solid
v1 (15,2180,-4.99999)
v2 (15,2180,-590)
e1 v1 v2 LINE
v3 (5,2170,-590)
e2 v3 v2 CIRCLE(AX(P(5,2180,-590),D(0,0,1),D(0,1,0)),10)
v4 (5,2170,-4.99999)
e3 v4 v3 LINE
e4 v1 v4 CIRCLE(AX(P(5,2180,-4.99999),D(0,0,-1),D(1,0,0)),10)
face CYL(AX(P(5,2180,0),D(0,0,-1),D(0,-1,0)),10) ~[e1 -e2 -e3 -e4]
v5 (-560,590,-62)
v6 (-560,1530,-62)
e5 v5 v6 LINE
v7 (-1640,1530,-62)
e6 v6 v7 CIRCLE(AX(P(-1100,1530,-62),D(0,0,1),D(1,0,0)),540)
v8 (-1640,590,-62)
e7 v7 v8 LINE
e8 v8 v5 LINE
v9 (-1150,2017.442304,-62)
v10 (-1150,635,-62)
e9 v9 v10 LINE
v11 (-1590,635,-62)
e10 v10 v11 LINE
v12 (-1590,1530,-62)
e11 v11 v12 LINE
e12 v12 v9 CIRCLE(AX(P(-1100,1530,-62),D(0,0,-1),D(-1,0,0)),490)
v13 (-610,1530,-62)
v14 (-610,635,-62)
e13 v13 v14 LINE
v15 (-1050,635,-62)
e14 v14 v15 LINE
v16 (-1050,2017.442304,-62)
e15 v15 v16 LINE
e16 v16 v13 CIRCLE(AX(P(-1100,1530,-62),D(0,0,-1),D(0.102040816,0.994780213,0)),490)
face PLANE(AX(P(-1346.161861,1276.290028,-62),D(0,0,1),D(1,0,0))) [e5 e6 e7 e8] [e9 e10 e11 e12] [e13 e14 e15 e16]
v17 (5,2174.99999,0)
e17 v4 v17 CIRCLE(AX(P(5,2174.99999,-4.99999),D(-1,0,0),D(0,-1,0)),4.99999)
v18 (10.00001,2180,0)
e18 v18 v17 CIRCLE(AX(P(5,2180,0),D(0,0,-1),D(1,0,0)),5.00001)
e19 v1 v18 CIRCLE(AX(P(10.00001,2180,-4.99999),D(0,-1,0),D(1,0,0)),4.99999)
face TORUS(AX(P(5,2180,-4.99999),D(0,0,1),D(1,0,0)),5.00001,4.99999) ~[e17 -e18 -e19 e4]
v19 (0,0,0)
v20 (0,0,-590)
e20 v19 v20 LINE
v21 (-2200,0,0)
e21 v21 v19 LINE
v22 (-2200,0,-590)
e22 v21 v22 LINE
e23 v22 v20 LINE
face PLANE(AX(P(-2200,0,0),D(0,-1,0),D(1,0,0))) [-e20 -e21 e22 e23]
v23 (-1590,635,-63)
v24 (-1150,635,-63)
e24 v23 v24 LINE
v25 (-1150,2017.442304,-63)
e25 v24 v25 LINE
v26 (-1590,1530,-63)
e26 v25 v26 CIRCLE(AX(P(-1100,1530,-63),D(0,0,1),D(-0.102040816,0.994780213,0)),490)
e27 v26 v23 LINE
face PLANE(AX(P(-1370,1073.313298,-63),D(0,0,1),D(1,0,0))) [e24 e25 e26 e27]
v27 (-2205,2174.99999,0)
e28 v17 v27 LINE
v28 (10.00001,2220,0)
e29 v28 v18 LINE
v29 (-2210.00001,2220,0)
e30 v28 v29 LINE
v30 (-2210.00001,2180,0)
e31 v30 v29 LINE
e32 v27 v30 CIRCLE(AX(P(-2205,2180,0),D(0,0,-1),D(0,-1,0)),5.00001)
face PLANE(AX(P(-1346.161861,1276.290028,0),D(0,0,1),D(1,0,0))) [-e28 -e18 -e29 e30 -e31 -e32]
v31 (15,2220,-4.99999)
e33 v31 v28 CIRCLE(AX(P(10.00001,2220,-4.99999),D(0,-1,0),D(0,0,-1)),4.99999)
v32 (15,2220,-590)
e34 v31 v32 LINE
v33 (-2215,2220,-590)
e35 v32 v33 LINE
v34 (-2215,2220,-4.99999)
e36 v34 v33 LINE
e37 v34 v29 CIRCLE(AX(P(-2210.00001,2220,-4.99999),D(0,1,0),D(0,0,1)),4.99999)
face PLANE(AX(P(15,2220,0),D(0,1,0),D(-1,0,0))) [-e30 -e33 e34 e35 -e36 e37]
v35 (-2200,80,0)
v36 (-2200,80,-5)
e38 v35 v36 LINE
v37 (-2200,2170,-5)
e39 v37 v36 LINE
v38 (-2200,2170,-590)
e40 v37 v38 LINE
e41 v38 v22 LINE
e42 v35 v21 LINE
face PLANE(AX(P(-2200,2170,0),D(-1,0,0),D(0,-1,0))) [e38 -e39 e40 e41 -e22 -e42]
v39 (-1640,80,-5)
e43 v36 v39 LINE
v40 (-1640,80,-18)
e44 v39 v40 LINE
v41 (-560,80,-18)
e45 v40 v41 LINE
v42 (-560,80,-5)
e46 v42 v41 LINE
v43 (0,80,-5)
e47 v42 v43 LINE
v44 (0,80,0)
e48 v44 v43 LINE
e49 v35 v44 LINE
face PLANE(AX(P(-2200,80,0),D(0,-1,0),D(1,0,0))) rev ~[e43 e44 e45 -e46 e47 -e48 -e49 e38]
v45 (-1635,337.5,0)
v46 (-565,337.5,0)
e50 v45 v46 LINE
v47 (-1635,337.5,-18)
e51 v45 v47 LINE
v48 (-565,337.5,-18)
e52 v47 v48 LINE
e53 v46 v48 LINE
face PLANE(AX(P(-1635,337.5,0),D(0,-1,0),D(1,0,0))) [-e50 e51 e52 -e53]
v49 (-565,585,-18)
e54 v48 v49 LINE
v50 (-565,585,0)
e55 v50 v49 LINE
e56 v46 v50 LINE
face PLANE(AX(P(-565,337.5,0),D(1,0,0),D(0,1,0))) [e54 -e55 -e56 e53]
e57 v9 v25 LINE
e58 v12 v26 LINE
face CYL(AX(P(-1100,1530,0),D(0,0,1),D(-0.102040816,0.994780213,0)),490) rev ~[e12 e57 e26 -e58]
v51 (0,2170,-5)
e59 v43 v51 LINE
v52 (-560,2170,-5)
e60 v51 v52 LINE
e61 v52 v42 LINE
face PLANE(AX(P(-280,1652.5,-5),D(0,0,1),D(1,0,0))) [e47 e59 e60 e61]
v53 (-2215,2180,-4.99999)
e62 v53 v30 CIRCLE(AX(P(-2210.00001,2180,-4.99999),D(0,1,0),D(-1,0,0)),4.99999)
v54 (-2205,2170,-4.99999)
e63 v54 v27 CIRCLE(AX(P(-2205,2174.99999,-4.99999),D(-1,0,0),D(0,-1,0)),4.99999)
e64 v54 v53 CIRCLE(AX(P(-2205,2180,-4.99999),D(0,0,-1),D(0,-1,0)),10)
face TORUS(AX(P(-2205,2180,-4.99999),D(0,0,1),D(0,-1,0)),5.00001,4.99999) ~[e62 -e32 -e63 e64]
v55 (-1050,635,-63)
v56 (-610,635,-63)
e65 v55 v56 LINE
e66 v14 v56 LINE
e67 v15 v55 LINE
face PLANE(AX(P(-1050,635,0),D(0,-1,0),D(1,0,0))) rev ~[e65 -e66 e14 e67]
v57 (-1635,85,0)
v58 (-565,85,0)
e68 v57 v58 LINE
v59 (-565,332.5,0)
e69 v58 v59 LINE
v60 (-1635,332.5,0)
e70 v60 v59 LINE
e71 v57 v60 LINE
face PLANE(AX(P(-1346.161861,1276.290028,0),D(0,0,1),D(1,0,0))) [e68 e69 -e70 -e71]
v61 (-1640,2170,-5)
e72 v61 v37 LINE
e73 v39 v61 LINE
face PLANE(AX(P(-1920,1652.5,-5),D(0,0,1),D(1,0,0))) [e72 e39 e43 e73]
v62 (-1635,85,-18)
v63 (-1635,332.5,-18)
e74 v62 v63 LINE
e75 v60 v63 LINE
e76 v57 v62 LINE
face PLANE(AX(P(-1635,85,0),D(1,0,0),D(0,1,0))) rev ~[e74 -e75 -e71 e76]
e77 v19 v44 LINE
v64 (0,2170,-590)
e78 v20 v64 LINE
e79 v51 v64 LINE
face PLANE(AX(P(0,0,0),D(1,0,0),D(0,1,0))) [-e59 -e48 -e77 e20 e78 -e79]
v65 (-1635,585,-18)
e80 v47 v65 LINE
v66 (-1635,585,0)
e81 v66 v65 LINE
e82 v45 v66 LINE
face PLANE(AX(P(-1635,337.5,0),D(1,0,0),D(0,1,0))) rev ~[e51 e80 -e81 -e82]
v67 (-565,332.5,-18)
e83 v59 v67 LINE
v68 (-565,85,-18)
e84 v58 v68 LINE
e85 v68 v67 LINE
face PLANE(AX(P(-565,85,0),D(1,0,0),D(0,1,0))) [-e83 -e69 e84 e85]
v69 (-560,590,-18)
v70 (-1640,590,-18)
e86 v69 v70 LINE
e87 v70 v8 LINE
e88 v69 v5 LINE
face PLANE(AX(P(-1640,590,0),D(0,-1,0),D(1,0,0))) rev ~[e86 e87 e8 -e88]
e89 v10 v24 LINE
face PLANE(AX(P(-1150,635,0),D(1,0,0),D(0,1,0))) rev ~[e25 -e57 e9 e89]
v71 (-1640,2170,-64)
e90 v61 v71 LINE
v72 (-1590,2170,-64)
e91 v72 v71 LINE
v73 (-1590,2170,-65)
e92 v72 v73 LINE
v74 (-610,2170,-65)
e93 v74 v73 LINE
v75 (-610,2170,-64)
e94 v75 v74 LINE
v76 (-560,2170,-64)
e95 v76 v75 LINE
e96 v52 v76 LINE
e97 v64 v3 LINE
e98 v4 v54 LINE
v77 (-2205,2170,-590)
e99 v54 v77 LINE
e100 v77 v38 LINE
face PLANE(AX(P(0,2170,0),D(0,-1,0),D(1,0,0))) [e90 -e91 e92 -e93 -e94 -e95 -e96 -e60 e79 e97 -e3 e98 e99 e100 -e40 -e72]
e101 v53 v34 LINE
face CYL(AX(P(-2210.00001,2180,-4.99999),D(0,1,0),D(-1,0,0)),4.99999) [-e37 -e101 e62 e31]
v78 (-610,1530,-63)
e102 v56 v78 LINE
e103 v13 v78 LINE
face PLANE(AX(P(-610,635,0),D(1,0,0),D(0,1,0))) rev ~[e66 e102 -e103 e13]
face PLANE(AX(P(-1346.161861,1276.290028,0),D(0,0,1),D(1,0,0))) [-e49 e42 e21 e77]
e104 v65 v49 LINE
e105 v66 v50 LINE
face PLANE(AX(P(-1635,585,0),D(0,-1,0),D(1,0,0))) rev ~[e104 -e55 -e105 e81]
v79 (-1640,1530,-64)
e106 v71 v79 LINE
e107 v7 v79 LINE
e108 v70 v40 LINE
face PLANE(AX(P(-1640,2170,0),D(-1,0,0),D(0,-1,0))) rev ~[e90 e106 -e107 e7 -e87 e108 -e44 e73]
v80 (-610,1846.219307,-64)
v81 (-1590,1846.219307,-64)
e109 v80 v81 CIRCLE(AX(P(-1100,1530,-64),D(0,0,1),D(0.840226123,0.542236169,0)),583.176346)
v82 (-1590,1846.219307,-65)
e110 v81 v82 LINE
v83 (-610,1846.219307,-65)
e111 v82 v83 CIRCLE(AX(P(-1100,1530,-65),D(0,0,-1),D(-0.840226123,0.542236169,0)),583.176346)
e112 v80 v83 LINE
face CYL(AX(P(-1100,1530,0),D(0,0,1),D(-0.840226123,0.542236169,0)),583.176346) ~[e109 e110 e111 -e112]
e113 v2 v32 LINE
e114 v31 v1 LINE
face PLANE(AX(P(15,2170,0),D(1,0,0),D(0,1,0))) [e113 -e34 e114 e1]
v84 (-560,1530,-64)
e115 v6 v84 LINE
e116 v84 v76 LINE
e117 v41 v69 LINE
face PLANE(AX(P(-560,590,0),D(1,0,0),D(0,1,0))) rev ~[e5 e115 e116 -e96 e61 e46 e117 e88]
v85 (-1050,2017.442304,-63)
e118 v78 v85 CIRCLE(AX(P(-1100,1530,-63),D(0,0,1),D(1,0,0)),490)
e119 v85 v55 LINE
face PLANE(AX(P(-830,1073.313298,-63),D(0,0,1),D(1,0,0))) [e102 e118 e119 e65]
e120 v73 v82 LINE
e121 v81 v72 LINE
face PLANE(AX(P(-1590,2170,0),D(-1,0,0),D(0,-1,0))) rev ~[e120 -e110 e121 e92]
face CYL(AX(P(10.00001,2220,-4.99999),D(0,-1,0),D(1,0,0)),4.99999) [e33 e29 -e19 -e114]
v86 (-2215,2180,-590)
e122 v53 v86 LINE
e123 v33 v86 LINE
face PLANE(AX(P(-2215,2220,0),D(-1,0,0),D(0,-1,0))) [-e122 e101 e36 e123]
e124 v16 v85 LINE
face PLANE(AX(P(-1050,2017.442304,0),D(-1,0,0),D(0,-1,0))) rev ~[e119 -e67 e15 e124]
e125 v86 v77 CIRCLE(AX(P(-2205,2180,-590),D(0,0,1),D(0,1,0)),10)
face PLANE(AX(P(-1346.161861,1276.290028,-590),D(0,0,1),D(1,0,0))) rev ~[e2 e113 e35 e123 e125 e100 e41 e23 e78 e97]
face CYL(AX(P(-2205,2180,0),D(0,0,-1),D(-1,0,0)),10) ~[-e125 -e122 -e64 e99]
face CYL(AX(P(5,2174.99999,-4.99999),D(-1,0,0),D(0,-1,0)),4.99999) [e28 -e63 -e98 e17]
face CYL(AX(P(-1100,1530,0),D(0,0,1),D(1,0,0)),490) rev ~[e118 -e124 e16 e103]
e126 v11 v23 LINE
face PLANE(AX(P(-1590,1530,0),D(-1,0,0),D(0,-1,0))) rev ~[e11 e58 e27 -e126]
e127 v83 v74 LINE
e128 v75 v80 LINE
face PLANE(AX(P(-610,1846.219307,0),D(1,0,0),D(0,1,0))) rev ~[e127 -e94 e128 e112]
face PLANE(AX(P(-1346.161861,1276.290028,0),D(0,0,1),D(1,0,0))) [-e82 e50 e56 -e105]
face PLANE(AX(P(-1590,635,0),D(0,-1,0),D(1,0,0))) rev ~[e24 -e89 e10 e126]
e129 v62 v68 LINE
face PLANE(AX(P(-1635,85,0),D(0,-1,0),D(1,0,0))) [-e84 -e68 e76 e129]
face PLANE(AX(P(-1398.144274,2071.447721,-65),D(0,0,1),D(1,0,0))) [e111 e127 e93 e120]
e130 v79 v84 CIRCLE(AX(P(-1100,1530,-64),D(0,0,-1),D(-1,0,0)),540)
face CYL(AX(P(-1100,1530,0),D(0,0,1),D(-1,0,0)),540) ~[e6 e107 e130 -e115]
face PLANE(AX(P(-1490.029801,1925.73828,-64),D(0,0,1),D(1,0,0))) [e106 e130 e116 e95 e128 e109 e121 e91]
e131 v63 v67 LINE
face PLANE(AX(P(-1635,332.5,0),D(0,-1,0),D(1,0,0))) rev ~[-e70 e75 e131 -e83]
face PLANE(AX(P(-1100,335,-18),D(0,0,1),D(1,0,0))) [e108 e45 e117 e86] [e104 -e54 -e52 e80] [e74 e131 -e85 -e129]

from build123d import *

# Parameters (mm, degrees)
F0_W     = 1070
F0_H     = 247.5
F0_W_2   = 440
F0_H_2   = 876.6265964508
F1_DEPTH = 590
F2_R     = 10
F3_DEPTH = 65
F4_DEPTH = 64
F5_DEPTH = 62
F6_DEPTH = 63
F7_DEPTH = 5
F8_R     = 4.99999
F9_DEPTH = 18


# Not quite as in the source:
# - a fillet or chamfer is up to 0.001 mm smaller than in the source, because OpenCascade refuses the exact size
# - a feature of the source that left no trace in its solid (it failed there, or was rolled back) is left out


with BuildPart() as f1:
    # F0 (on Top) → F1 (new body)
    with BuildSketch(Plane.XY):
        with BuildLine():
            Line((-1640, 1530), (-1640, 1135))
            Line((-1640, 1135), (-1640, 590))
            Line((-1640, 590), (-1100, 590))
            Line((-1100, 590), (-1100, 1511.6265964508))
            Line((-1100, 1511.6265964508), (-1100, 2020))
            Line((-1100, 2020), (-1100, 2070))
            ThreePointArc((-1100, 2070), (-1481.8376618407, 1911.8376618407), (-1640, 1530))
        make_face()
        with BuildLine():
            Line((-1150, 1530), (-1150, 1511.6265964508))
            Line((-1150, 1511.6265964508), (-1150, 635))
            Line((-1150, 635), (-1590, 635))
            Line((-1590, 635), (-1590, 1511.6265964508))
            Line((-1590, 1511.6265964508), (-1590, 1530))
            ThreePointArc((-1590, 1530), (-1463.7306695895, 1858.3291031876), (-1150, 2017.4423042782))
            Line((-1150, 2017.4423042782), (-1150, 1530))
        make_face(mode=Mode.SUBTRACT)
        with BuildLine():
            Line((-560, 590), (-560, 1135))
            Line((-560, 1135), (-560, 1530))
            ThreePointArc((-560, 1530), (-644.9475295345, 1820.7357032139), (-873.0638856418, 2020))
            Line((-873.0638856418, 2020), (-1100, 2020))
            Line((-1100, 2020), (-1100, 1511.6265964508))
            Line((-1100, 1511.6265964508), (-1100, 590))
            Line((-1100, 590), (-560, 590))
        make_face()
        with BuildLine():
            Line((-1050, 635), (-1050, 1511.6265964508))
            Line((-1050, 1511.6265964508), (-1050, 1530))
            Line((-1050, 1530), (-1050, 2017.4423042782))
            ThreePointArc((-1050, 2017.4423042782), (-736.2693304105, 1858.3291031876), (-610, 1530))
            Line((-610, 1530), (-610, 1511.6265964508))
            Line((-610, 1511.6265964508), (-610, 635))
            Line((-610, 635), (-1050, 635))
        make_face(mode=Mode.SUBTRACT)
        Polygon((-560, 80), (0, 80), (0, 1135), (-560, 1135), (-560, 590), align=None)
        Polygon((-2200, 1135), (-2200, 80), (-1640, 80), (-1640, 590), (-1640, 1135), align=None)
        Polygon((-2200, 2170), (-2200, 1135), (-1640, 1135), (-1640, 1530), (-1640, 2170), align=None)
        Polygon((-560, 1135), (0, 1135), (0, 2170), (-560, 2170), (-560, 1530), align=None)
        Polygon((-1100, 80), (-560, 80), (-560, 590), (-1100, 590), (-1640, 590), (-1640, 80), align=None)
        with Locations((-1100, 208.75)):
            Rectangle(F0_W, F0_H, mode=Mode.SUBTRACT)
        with Locations((-1100, 461.25)):
            Rectangle(F0_W, F0_H, mode=Mode.SUBTRACT)
        with Locations((-830, 1073.3132982254)):
            Rectangle(F0_W_2, F0_H_2)
        with Locations((-1370, 1073.3132982254)):
            Rectangle(F0_W_2, F0_H_2)
        with Locations((-1100, 461.25)):
            Rectangle(F0_W, F0_H)
        with Locations((-1100, 208.75)):
            Rectangle(F0_W, F0_H)
        Polygon((-2200, 0), (0, 0), (0, 80), (-560, 80), (-1100, 80), (-1640, 80), (-2200, 80), align=None)
        with BuildLine():
            Line((-1590, 1511.6265964508), (-1150, 1511.6265964508))
            Line((-1150, 1511.6265964508), (-1150, 1530))
            Line((-1150, 1530), (-1150, 2017.4423042782))
            ThreePointArc((-1150, 2017.4423042782), (-1463.7306695895, 1858.3291031876), (-1590, 1530))
            Line((-1590, 1530), (-1590, 1511.6265964508))
        make_face()
        with BuildLine():
            Line((-1050, 1530), (-1050, 1511.6265964508))
            Line((-1050, 1511.6265964508), (-610, 1511.6265964508))
            Line((-610, 1511.6265964508), (-610, 1530))
            ThreePointArc((-610, 1530), (-736.2693304105, 1858.3291031876), (-1050, 2017.4423042782))
            Line((-1050, 2017.4423042782), (-1050, 1530))
        make_face()
        Polygon((-560, 2170), (0, 2170), (15, 2170), (15, 2220), (0, 2220), (-2200, 2220), (-2215, 2220), (-2215, 2170), (-2200, 2170), (-1640, 2170), (-1590, 2170), (-1100, 2170), (-610, 2170), align=None)
        with BuildLine():
            Line((-1100, 2170), (-1590, 2170))
            Line((-1590, 2170), (-1590, 1846.2193073328))
            ThreePointArc((-1590, 1846.2193073328), (-1379.000923117, 2042.1065662827), (-1100, 2113.1763458252))
            Line((-1100, 2113.1763458252), (-1100, 2170))
        make_face()
        with BuildLine():
            Line((-610, 2020), (-610, 2170))
            Line((-610, 2170), (-1100, 2170))
            Line((-1100, 2170), (-1100, 2113.1763458252))
            ThreePointArc((-1100, 2113.1763458252), (-935.1694189847, 2089.397470402), (-783.7806926672, 2020))
            Line((-783.7806926672, 2020), (-610, 2020))
        make_face()
        with BuildLine():
            Line((-1590, 2170), (-1640, 2170))
            Line((-1640, 2170), (-1640, 1530))
            ThreePointArc((-1640, 1530), (-1481.8376618407, 1911.8376618407), (-1100, 2070))
            Line((-1100, 2070), (-1100, 2113.1763458252))
            ThreePointArc((-1100, 2113.1763458252), (-1379.000923117, 2042.1065662827), (-1590, 1846.2193073328))
            Line((-1590, 1846.2193073328), (-1590, 2170))
        make_face()
        with BuildLine():
            Line((-560, 1530), (-560, 2170))
            Line((-560, 2170), (-610, 2170))
            Line((-610, 2170), (-610, 2020))
            Line((-610, 2020), (-610, 1846.2193073328))
            ThreePointArc((-610, 1846.2193073328), (-687.6320512394, 1942.3679487606), (-783.7806926672, 2020))
            Line((-783.7806926672, 2020), (-873.0638856418, 2020))
            ThreePointArc((-873.0638856418, 2020), (-644.9475295345, 1820.7357032139), (-560, 1530))
        make_face()
        with BuildLine():
            Line((-610, 1846.2193073328), (-610, 2020))
            Line((-610, 2020), (-783.7806926672, 2020))
            ThreePointArc((-783.7806926672, 2020), (-687.6320512394, 1942.3679487606), (-610, 1846.2193073328))
        make_face()
        with BuildLine():
            ThreePointArc((-1100, 2070), (-983.8104996138, 2057.3518749374), (-873.0638856418, 2020))
            Line((-873.0638856418, 2020), (-783.7806926672, 2020))
            ThreePointArc((-783.7806926672, 2020), (-935.1694189847, 2089.397470402), (-1100, 2113.1763458252))
            Line((-1100, 2113.1763458252), (-1100, 2070))
        make_face()
        with BuildLine():
            Line((-1100, 2020), (-873.0638856418, 2020))
            ThreePointArc((-873.0638856418, 2020), (-983.8104996138, 2057.3518749374), (-1100, 2070))
            Line((-1100, 2070), (-1100, 2020))
        make_face()
    extrude(amount=-F1_DEPTH)

    # F2
    f2_edges = [f1.edges().sort_by_distance(p)[0] for p in [
        (15, 2170, -295),
        (-2215, 2170, -295),
    ]]
    fillet(f2_edges, radius=F2_R)

    # F0 (on Top) → F3 (cut)
    with BuildSketch(Plane.XY):
        with BuildLine():
            Line((-1100, 2170), (-1590, 2170))
            Line((-1590, 2170), (-1590, 1846.2193073328))
            ThreePointArc((-1590, 1846.2193073328), (-1379.000923117, 2042.1065662827), (-1100, 2113.1763458252))
            Line((-1100, 2113.1763458252), (-1100, 2170))
        make_face()
        with BuildLine():
            Line((-610, 2020), (-610, 2170))
            Line((-610, 2170), (-1100, 2170))
            Line((-1100, 2170), (-1100, 2113.1763458252))
            ThreePointArc((-1100, 2113.1763458252), (-935.1694189847, 2089.397470402), (-783.7806926672, 2020))
            Line((-783.7806926672, 2020), (-610, 2020))
        make_face()
        with BuildLine():
            Line((-610, 1846.2193073328), (-610, 2020))
            Line((-610, 2020), (-783.7806926672, 2020))
            ThreePointArc((-783.7806926672, 2020), (-687.6320512394, 1942.3679487606), (-610, 1846.2193073328))
        make_face()
    extrude(amount=-F3_DEPTH, mode=Mode.SUBTRACT)

    # F0 (on Top) → F4 (cut)
    with BuildSketch(Plane.XY):
        with BuildLine():
            Line((-1590, 2170), (-1640, 2170))
            Line((-1640, 2170), (-1640, 1530))
            ThreePointArc((-1640, 1530), (-1481.8376618407, 1911.8376618407), (-1100, 2070))
            Line((-1100, 2070), (-1100, 2113.1763458252))
            ThreePointArc((-1100, 2113.1763458252), (-1379.000923117, 2042.1065662827), (-1590, 1846.2193073328))
            Line((-1590, 1846.2193073328), (-1590, 2170))
        make_face()
        with BuildLine():
            ThreePointArc((-1100, 2070), (-983.8104996138, 2057.3518749374), (-873.0638856418, 2020))
            Line((-873.0638856418, 2020), (-783.7806926672, 2020))
            ThreePointArc((-783.7806926672, 2020), (-935.1694189847, 2089.397470402), (-1100, 2113.1763458252))
            Line((-1100, 2113.1763458252), (-1100, 2070))
        make_face()
        with BuildLine():
            Line((-560, 1530), (-560, 2170))
            Line((-560, 2170), (-610, 2170))
            Line((-610, 2170), (-610, 2020))
            Line((-610, 2020), (-610, 1846.2193073328))
            ThreePointArc((-610, 1846.2193073328), (-687.6320512394, 1942.3679487606), (-783.7806926672, 2020))
            Line((-783.7806926672, 2020), (-873.0638856418, 2020))
            ThreePointArc((-873.0638856418, 2020), (-644.9475295345, 1820.7357032139), (-560, 1530))
        make_face()
    extrude(amount=-F4_DEPTH, mode=Mode.SUBTRACT)

    # F0 (on Top) → F5 (cut)
    with BuildSketch(Plane.XY):
        with BuildLine():
            Line((-1640, 1530), (-1640, 1135))
            Line((-1640, 1135), (-1640, 590))
            Line((-1640, 590), (-1100, 590))
            Line((-1100, 590), (-1100, 1511.6265964508))
            Line((-1100, 1511.6265964508), (-1100, 2020))
            Line((-1100, 2020), (-1100, 2070))
            ThreePointArc((-1100, 2070), (-1481.8376618407, 1911.8376618407), (-1640, 1530))
        make_face()
        with BuildLine():
            Line((-1150, 1530), (-1150, 1511.6265964508))
            Line((-1150, 1511.6265964508), (-1150, 635))
            Line((-1150, 635), (-1590, 635))
            Line((-1590, 635), (-1590, 1511.6265964508))
            Line((-1590, 1511.6265964508), (-1590, 1530))
            ThreePointArc((-1590, 1530), (-1463.7306695895, 1858.3291031876), (-1150, 2017.4423042782))
            Line((-1150, 2017.4423042782), (-1150, 1530))
        make_face(mode=Mode.SUBTRACT)
        with BuildLine():
            Line((-1100, 2020), (-873.0638856418, 2020))
            ThreePointArc((-873.0638856418, 2020), (-983.8104996138, 2057.3518749374), (-1100, 2070))
            Line((-1100, 2070), (-1100, 2020))
        make_face()
        with BuildLine():
            Line((-560, 590), (-560, 1135))
            Line((-560, 1135), (-560, 1530))
            ThreePointArc((-560, 1530), (-644.9475295345, 1820.7357032139), (-873.0638856418, 2020))
            Line((-873.0638856418, 2020), (-1100, 2020))
            Line((-1100, 2020), (-1100, 1511.6265964508))
            Line((-1100, 1511.6265964508), (-1100, 590))
            Line((-1100, 590), (-560, 590))
        make_face()
        with BuildLine():
            Line((-1050, 635), (-1050, 1511.6265964508))
            Line((-1050, 1511.6265964508), (-1050, 1530))
            Line((-1050, 1530), (-1050, 2017.4423042782))
            ThreePointArc((-1050, 2017.4423042782), (-736.2693304105, 1858.3291031876), (-610, 1530))
            Line((-610, 1530), (-610, 1511.6265964508))
            Line((-610, 1511.6265964508), (-610, 635))
            Line((-610, 635), (-1050, 635))
        make_face(mode=Mode.SUBTRACT)
    extrude(amount=-F5_DEPTH, mode=Mode.SUBTRACT)

    # F0 (on Top) → F6 (cut)
    with BuildSketch(Plane.XY):
        with Locations((-1370, 1073.3132982254)):
            Rectangle(F0_W_2, F0_H_2)
        with Locations((-830, 1073.3132982254)):
            Rectangle(F0_W_2, F0_H_2)
        with BuildLine():
            Line((-1050, 1530), (-1050, 1511.6265964508))
            Line((-1050, 1511.6265964508), (-610, 1511.6265964508))
            Line((-610, 1511.6265964508), (-610, 1530))
            ThreePointArc((-610, 1530), (-736.2693304105, 1858.3291031876), (-1050, 2017.4423042782))
            Line((-1050, 2017.4423042782), (-1050, 1530))
        make_face()
        with BuildLine():
            Line((-1590, 1511.6265964508), (-1150, 1511.6265964508))
            Line((-1150, 1511.6265964508), (-1150, 1530))
            Line((-1150, 1530), (-1150, 2017.4423042782))
            ThreePointArc((-1150, 2017.4423042782), (-1463.7306695895, 1858.3291031876), (-1590, 1530))
            Line((-1590, 1530), (-1590, 1511.6265964508))
        make_face()
    extrude(amount=-F6_DEPTH, mode=Mode.SUBTRACT)

    # F0 (on Top) → F7 (cut)
    with BuildSketch(Plane.XY):
        Polygon((-2200, 2170), (-2200, 1135), (-1640, 1135), (-1640, 1530), (-1640, 2170), align=None)
        Polygon((-2200, 1135), (-2200, 80), (-1640, 80), (-1640, 590), (-1640, 1135), align=None)
        Polygon((-560, 1135), (0, 1135), (0, 2170), (-560, 2170), (-560, 1530), align=None)
        Polygon((-560, 80), (0, 80), (0, 1135), (-560, 1135), (-560, 590), align=None)
    extrude(amount=-F7_DEPTH, mode=Mode.SUBTRACT)

    # F8 (radius 5 in the source; OpenCascade refuses exactly that, so slightly less here)
    f8_edges = [f1.edges().sort_by_distance(p)[0] for p in [
        (-1100, 2170, 0),
    ]]
    fillet(f8_edges, radius=F8_R)

    # F0 (on Top) → F9 (cut)
    with BuildSketch(Plane.XY):
        Polygon((-1100, 80), (-560, 80), (-560, 590), (-1100, 590), (-1640, 590), (-1640, 80), align=None)
        with Locations((-1100, 208.75)):
            Rectangle(F0_W, F0_H, mode=Mode.SUBTRACT)
        with Locations((-1100, 461.25)):
            Rectangle(F0_W, F0_H, mode=Mode.SUBTRACT)
    extrude(amount=-F9_DEPTH, mode=Mode.SUBTRACT)


solid = f1.part
